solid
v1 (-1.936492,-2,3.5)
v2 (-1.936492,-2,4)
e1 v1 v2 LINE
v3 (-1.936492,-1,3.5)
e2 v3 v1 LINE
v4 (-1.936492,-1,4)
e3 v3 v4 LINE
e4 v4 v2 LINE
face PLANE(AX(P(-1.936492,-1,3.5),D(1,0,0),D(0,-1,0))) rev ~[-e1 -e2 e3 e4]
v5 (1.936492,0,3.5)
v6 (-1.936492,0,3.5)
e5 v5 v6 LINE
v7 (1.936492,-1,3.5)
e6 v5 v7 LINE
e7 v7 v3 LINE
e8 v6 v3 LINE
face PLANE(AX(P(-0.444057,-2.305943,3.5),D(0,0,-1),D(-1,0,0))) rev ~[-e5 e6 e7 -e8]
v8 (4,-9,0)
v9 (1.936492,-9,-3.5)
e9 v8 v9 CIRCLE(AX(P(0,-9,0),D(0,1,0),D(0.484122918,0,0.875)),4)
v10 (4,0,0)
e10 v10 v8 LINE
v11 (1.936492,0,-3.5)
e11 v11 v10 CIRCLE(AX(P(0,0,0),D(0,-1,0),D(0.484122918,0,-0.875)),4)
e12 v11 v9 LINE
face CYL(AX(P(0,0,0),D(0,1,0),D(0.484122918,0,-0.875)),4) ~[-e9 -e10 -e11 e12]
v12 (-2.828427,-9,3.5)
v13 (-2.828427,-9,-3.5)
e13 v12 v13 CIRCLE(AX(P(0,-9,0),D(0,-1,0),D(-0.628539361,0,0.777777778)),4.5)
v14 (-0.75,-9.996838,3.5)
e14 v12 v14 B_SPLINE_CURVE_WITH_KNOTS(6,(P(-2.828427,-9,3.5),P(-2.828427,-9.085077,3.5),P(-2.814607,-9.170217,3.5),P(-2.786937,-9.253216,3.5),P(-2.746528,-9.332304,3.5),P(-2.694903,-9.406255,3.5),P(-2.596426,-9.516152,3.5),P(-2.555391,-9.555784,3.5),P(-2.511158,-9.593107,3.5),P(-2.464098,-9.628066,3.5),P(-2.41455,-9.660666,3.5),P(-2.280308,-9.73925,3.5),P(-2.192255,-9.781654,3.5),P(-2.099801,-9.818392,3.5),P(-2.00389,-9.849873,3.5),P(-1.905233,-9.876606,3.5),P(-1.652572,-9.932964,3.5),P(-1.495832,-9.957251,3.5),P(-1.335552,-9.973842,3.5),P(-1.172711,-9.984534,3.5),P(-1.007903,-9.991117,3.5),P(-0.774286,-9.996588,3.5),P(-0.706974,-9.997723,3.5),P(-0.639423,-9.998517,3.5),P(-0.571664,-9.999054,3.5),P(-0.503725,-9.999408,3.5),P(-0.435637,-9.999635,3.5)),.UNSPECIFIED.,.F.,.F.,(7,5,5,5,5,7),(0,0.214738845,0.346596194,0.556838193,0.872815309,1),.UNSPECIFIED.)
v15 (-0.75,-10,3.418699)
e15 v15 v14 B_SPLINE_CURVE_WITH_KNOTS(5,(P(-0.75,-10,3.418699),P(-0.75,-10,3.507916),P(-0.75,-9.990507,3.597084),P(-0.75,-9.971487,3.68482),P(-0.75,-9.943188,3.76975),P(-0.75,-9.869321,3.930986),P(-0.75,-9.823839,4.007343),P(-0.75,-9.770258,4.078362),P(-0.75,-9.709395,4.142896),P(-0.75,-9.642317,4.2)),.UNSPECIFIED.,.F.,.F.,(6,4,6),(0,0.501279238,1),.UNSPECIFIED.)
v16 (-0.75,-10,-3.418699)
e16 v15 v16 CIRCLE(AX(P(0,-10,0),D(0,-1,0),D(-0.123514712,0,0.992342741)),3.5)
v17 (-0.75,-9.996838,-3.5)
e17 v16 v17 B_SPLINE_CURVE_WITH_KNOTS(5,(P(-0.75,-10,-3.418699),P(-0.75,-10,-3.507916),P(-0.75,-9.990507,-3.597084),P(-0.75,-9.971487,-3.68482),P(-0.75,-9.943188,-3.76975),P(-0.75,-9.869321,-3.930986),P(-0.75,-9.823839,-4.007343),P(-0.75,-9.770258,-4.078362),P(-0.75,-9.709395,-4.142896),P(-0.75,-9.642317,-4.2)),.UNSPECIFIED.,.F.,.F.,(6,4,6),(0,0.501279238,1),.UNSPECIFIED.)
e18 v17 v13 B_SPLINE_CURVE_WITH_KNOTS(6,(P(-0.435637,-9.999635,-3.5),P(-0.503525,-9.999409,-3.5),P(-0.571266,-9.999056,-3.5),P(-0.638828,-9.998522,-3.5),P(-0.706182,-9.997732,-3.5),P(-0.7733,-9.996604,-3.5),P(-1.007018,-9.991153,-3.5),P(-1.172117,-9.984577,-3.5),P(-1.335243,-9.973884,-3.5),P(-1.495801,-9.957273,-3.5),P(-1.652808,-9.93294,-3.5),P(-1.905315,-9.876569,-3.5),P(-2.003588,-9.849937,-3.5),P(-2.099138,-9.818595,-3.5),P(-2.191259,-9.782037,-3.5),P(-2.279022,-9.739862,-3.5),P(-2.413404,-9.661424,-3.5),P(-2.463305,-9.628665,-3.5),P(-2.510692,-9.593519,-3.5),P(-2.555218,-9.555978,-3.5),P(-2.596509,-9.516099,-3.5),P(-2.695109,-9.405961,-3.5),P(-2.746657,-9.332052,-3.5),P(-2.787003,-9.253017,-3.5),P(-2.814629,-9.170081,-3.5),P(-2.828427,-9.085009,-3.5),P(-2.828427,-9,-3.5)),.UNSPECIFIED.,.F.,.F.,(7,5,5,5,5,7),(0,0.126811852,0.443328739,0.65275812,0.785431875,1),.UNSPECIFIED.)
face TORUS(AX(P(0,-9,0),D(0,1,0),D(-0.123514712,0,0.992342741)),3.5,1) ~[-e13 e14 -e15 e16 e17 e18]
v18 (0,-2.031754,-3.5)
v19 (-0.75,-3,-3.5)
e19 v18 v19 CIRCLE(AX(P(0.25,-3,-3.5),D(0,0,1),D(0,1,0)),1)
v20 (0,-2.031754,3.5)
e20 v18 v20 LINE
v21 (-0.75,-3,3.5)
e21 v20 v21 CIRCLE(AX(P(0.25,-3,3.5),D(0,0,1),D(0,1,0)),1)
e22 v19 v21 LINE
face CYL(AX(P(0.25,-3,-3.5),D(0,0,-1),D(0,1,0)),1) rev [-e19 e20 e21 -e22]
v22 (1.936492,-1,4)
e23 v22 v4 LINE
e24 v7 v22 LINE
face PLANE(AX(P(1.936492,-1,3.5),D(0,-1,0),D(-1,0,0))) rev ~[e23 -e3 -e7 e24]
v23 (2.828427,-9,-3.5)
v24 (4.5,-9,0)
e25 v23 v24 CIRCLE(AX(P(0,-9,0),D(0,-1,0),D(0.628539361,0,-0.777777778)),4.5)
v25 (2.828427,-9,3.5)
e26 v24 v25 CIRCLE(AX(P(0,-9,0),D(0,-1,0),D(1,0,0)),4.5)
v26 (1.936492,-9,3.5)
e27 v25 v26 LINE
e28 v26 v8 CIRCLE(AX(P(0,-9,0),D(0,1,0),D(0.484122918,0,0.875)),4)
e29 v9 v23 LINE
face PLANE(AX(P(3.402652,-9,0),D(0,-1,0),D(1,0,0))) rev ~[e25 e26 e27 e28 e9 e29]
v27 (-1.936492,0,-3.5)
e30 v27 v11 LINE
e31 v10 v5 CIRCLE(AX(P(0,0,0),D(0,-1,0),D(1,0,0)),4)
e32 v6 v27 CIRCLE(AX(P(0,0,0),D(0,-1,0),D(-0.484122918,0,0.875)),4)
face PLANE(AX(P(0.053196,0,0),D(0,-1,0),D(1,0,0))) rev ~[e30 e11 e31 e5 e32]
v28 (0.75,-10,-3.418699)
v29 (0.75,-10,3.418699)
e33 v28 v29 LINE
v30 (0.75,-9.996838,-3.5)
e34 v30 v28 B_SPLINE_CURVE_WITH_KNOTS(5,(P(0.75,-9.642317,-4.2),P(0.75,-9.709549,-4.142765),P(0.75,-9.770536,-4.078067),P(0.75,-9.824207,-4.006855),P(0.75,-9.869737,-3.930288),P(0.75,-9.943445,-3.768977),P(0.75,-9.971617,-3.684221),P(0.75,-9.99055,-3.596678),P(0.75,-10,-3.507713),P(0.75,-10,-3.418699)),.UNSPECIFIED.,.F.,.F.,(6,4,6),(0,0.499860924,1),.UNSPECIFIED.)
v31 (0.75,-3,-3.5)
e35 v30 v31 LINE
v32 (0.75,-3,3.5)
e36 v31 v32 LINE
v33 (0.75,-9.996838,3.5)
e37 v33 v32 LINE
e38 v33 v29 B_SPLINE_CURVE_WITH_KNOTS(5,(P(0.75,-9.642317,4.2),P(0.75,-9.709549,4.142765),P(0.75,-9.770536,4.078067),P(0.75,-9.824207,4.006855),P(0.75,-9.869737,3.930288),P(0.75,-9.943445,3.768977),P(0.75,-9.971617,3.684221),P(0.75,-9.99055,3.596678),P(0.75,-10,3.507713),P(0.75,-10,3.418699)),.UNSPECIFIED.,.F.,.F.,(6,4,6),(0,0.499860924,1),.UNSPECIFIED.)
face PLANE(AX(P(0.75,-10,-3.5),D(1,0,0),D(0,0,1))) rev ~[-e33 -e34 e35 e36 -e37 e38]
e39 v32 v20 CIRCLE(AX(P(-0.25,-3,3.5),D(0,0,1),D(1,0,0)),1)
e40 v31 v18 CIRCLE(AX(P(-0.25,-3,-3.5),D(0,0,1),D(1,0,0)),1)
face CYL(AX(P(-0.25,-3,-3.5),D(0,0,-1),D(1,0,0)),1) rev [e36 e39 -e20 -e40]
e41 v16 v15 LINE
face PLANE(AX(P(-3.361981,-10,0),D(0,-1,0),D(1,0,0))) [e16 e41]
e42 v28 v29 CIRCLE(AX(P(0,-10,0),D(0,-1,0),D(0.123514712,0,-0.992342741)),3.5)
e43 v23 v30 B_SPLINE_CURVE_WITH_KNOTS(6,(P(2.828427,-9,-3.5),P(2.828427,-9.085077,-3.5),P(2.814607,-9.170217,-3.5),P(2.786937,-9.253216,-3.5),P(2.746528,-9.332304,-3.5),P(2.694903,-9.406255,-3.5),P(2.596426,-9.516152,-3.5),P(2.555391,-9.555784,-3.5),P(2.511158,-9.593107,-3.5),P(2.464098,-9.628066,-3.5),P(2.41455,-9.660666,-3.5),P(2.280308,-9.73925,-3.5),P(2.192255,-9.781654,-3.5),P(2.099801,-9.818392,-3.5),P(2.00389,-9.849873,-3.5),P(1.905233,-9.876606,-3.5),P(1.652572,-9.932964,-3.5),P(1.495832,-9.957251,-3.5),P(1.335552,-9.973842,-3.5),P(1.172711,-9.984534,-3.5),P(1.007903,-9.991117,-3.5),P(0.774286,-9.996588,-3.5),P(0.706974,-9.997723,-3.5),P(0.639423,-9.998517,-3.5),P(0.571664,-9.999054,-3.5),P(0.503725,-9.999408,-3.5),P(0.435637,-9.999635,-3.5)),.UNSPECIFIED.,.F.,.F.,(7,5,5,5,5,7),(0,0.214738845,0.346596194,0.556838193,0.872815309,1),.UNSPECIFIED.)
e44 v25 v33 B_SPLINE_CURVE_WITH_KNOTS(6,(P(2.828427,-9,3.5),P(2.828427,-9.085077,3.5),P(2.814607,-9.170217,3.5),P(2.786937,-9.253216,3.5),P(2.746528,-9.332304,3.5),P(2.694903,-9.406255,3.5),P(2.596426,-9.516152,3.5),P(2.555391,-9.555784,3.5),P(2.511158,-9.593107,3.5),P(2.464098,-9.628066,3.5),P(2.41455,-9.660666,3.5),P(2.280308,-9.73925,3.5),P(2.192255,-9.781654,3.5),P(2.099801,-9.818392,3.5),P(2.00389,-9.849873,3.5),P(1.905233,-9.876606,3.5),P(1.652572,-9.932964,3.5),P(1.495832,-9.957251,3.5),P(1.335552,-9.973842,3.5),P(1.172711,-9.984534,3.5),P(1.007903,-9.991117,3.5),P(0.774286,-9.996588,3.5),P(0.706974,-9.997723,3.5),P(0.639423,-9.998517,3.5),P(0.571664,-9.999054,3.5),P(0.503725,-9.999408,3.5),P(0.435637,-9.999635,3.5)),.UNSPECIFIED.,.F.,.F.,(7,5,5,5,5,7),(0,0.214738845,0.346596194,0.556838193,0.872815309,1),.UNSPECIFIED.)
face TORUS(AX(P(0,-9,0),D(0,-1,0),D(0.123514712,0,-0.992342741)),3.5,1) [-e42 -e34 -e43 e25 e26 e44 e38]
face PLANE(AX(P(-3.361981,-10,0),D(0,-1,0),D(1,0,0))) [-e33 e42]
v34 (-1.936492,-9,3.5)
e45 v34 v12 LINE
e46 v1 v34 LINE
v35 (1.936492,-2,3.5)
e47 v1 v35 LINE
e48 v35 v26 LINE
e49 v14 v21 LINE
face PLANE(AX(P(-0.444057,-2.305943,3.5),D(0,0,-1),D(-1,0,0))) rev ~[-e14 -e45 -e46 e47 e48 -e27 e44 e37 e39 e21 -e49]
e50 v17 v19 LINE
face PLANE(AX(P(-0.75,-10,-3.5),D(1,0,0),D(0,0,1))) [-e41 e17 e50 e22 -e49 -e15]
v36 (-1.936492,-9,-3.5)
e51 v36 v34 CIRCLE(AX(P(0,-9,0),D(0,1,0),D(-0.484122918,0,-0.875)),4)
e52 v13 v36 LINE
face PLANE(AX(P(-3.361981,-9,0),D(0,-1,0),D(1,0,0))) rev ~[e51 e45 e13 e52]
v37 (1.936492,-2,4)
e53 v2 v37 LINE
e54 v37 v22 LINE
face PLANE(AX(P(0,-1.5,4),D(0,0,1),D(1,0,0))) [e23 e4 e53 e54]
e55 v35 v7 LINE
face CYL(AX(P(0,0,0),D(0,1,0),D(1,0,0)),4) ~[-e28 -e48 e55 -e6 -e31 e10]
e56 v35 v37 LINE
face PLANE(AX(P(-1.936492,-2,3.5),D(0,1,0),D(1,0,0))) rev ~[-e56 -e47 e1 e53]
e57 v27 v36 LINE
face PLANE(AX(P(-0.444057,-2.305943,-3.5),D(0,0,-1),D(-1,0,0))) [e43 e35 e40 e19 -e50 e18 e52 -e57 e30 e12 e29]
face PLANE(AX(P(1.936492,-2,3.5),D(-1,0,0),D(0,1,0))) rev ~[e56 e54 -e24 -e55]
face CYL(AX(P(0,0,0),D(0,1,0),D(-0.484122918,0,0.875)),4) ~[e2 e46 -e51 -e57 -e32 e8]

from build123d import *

# Parameters (mm, degrees)
F1_DEPTH    = 10
F3_DEPTH    = 1
F2_W        = 1.5
F2_H        = 7
F4_DEPTH    = 8
F6_T1_DEPTH = 7
F6_T4_ANGLE = 165.8100193305
F6_T6_ANGLE = 165.8100193305
F7_DEPTH    = 0.5


# Not quite as in the source:
# - a fillet or chamfer that OpenCascade refuses, or shapes differently, is made with other operations: its cross-section is extruded or revolved along the edge and cut away or added


with BuildPart() as f1:
    # F0 (on Front) → F1 (new body)
    with BuildSketch(Plane.XZ):
        with BuildLine():
            ThreePointArc((1.9364916731, -3.5), (3.4457195687, -2.0315060063), (4, 0))
            ThreePointArc((4, 0), (3.4457195687, 2.0315060063), (1.9364916731, 3.5))
            Line((1.9364916731, 3.5), (-1.9364916731, 3.5))
            ThreePointArc((-1.9364916731, 3.5), (-4, 0), (-1.9364916731, -3.5))
            Line((-1.9364916731, -3.5), (1.9364916731, -3.5))
        make_face()
    extrude(amount=F1_DEPTH)

    # F2 (on face) → F3 (join)
    with BuildSketch(Plane.XZ.offset(10)):
        with BuildLine():
            Line((-1.9364916731, 3.5), (-2.8284271247, 3.5))
            ThreePointArc((-2.8284271247, 3.5), (-4.5, 0), (-2.8284271247, -3.5))
            Line((-2.8284271247, -3.5), (-1.9364916731, -3.5))
            ThreePointArc((-1.9364916731, -3.5), (-4, 0), (-1.9364916731, 3.5))
        make_face()
        with BuildLine():
            ThreePointArc((2.8284271247, -3.5), (4.0606601718, -1.9393398282), (4.5, 0))
            ThreePointArc((4.5, 0), (4.0606601718, 1.9393398282), (2.8284271247, 3.5))
            Line((2.8284271247, 3.5), (1.9364916731, 3.5))
            ThreePointArc((1.9364916731, 3.5), (4, 0), (1.9364916731, -3.5))
            Line((1.9364916731, -3.5), (2.8284271247, -3.5))
        make_face()
    extrude(amount=-F3_DEPTH)

    # F2 (on face) → F4 (cut)
    with BuildSketch(Plane.XZ.offset(10)):
        Rectangle(F2_W, F2_H)
    extrude(amount=-F4_DEPTH, mode=Mode.SUBTRACT)

    # F6: fillet of radius 1 on 4 edges, made by hand

    # F6_s2 → F6_t1 (join)
    with BuildSketch(Plane.XY.offset(-3.5)):
        with BuildLine():
            ThreePointArc((0.25, -2), (-0.4571067812, -2.2928932188), (-0.75, -3))
            Line((-0.75, -3), (-0.75, -2))
            Line((-0.75, -2), (0.25, -2))
        make_face()
        with BuildLine():
            ThreePointArc((0.75, -3), (0.4571067812, -2.2928932188), (-0.25, -2))
            Line((-0.25, -2), (0.75, -2))
            Line((0.75, -2), (0.75, -3))
        make_face()
    extrude(amount=F6_T1_DEPTH)

    # F6_s3 → F6_t4 (revolve, cut)
    with BuildSketch(Plane(origin=(0, 0, 0), x_dir=(0, 1, 0), z_dir=(0.9923427412, 0, 0.1235147116))):
        with BuildLine():
            ThreePointArc((-10, 3.5), (-9.7071067812, 4.2071067812), (-9, 4.5))
            Line((-9, 4.5), (-10, 4.5))
            Line((-10, 4.5), (-10, 3.5))
        make_face()
    revolve(axis=Axis((0, -10, 0), (0, -1, 0)), revolution_arc=F6_T4_ANGLE, mode=Mode.SUBTRACT)

    # F6_s5 → F6_t6 (revolve, cut)
    with BuildSketch(Plane(origin=(0, 0, 0), x_dir=(0, 1, 0), z_dir=(-0.9923427412, 0, -0.1235147116))):
        with BuildLine():
            ThreePointArc((-9, 4.5), (-9.7071067812, 4.2071067812), (-10, 3.5))
            Line((-10, 3.5), (-10, 4.5))
            Line((-10, 4.5), (-9, 4.5))
        make_face()
    revolve(axis=Axis((0, -10, 0), (0, -1, 0)), revolution_arc=F6_T6_ANGLE, mode=Mode.SUBTRACT)

    # F5 (on face) → F7 (join)
    with BuildSketch(Plane.XY.offset(3.5)):
        Polygon((-1.9364916731, -1), (-1.9364916731, -2), (-0.75, -2), (0.75, -2), (1.9364916731, -2), (1.9364916731, -1), align=None)
    extrude(amount=F7_DEPTH)


solid = f1.part
